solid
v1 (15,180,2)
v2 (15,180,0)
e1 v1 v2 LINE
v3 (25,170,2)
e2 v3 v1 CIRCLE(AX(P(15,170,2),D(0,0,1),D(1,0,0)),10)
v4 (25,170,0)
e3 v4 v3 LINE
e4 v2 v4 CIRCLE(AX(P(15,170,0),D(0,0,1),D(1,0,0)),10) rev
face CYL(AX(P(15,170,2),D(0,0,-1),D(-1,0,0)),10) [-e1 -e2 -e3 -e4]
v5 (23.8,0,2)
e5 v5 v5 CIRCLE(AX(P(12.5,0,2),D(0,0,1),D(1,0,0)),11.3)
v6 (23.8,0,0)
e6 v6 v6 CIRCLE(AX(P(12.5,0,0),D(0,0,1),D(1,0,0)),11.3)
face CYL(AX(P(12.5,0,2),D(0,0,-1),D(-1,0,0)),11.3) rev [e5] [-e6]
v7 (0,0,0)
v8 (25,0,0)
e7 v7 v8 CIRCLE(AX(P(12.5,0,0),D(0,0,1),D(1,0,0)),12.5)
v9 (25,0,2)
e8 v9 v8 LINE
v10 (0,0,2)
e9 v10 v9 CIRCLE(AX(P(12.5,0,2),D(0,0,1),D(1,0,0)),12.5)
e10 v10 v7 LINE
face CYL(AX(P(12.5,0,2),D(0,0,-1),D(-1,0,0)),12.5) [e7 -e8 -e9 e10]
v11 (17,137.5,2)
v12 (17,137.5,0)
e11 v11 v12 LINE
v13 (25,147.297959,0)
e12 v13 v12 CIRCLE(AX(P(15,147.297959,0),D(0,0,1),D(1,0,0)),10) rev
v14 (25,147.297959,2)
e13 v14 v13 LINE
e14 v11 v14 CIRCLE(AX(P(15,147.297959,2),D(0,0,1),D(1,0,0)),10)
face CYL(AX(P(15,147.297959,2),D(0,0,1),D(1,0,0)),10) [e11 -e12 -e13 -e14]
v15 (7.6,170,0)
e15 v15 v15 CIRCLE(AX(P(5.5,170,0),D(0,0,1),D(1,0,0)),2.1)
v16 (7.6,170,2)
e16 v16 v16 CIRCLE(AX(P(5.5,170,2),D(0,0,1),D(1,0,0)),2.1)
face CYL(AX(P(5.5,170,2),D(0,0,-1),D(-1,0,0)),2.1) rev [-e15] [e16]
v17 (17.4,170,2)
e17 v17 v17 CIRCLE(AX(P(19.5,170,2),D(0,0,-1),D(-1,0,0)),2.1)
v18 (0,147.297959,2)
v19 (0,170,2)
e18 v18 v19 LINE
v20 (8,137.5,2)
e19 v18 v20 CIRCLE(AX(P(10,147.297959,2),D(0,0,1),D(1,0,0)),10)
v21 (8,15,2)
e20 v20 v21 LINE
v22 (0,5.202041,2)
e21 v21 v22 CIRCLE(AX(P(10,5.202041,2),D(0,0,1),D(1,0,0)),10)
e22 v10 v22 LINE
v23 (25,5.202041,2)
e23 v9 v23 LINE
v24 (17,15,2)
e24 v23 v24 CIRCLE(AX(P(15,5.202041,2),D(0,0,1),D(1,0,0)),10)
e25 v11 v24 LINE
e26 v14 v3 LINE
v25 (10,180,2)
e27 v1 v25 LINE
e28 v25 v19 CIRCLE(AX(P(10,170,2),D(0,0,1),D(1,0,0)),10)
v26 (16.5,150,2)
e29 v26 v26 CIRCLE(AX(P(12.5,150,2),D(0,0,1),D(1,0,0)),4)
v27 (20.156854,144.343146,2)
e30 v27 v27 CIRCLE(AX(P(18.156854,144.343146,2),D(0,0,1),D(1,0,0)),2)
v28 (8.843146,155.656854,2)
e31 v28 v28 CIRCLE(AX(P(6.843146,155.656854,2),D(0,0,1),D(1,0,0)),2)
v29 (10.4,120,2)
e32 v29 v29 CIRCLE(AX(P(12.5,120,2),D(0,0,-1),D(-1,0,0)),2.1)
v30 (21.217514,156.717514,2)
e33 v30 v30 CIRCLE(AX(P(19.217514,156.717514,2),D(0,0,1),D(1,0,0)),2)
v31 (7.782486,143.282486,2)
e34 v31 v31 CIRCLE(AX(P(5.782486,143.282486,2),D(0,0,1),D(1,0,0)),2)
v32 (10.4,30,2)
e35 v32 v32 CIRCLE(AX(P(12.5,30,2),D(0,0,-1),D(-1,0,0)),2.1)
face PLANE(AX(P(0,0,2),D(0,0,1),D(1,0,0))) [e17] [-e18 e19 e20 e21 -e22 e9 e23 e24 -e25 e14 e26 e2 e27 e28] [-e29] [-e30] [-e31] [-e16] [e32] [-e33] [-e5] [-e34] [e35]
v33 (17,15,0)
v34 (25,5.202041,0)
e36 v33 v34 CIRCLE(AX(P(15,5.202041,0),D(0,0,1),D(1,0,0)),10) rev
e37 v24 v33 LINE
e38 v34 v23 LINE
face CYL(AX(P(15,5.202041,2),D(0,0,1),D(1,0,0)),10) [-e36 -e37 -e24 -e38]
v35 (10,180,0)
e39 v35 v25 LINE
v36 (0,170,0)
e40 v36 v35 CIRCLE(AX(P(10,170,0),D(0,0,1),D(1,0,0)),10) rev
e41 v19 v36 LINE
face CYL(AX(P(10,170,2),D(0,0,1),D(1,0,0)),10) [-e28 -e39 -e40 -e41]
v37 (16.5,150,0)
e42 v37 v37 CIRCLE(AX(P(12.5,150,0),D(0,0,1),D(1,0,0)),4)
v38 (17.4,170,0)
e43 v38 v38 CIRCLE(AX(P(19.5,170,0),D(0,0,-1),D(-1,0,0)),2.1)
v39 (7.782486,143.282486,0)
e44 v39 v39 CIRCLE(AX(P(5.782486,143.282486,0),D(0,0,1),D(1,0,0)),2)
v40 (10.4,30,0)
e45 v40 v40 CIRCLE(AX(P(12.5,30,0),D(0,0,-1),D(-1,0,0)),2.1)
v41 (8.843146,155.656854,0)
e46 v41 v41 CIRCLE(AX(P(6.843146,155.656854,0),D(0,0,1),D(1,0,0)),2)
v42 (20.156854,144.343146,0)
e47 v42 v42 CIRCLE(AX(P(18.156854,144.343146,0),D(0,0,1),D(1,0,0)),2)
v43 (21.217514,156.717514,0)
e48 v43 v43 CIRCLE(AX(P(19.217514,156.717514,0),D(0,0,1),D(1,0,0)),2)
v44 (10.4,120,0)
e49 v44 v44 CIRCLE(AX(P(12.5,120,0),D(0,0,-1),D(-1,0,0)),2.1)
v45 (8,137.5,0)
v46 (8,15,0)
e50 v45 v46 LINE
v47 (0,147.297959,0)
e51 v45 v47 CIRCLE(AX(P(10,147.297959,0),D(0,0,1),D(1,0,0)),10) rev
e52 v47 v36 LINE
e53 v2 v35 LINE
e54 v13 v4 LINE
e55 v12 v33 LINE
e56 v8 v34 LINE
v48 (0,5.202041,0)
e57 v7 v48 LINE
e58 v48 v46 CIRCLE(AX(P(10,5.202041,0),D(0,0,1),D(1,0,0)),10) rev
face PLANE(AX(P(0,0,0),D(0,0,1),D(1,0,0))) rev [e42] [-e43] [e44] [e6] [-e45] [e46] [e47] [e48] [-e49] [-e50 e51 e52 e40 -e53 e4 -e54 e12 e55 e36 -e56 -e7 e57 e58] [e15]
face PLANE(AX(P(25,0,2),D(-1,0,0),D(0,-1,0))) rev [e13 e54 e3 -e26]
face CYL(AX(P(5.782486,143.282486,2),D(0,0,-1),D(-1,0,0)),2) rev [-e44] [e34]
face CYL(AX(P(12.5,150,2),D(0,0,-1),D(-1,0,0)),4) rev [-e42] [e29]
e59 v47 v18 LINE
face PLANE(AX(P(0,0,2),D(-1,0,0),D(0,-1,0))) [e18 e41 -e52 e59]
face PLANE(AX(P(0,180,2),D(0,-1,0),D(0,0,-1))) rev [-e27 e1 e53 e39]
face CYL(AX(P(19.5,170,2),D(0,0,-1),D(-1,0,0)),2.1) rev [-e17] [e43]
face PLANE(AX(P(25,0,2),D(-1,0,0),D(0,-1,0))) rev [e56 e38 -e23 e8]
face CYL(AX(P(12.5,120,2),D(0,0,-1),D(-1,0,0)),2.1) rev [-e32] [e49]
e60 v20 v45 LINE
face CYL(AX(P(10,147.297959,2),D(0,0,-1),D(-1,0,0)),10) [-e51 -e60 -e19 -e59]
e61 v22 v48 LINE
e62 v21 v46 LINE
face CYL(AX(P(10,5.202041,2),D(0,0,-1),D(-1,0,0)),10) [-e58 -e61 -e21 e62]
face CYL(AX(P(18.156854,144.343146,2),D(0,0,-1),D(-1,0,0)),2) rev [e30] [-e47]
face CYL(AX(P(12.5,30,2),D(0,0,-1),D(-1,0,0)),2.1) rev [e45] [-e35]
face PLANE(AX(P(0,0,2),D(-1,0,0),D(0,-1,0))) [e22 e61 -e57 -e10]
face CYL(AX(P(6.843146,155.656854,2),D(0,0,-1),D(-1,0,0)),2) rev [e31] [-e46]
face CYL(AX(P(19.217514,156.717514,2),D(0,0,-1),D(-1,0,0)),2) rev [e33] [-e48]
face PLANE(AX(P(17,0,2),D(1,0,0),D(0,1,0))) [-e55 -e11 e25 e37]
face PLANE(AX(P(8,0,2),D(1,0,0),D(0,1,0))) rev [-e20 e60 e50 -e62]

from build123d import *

# Parameters (mm, degrees)
SKETCH1_R           = 11.3
SKETCH1_R_2         = 4
SKETCH1_R_3         = 2
BOSS_EXTRUDE1_DEPTH = 2
FILLET1_R           = 10
SKETCH2_R           = 2.1
CUT_EXTRUDE1_DEPTH  = 182.73882359


with BuildPart() as part:
    # Sketch1 → Boss-Extrude1 (new body)
    with BuildSketch(Plane.XY):
        with BuildLine():
            ThreePointArc((0, 0), (12.5, -12.5), (25, 0))
            Line((25, 0), (25, 15))
            Line((25, 15), (17, 15))
            Line((17, 15), (17, 137.5))
            Line((17, 137.5), (25, 137.5))
            Line((25, 137.5), (25, 180))
            Line((25, 180), (0, 180))
            Line((0, 180), (0, 137.5))
            Line((0, 137.5), (8, 137.5))
            Line((8, 137.5), (8, 15))
            Line((8, 15), (0, 15))
            Line((0, 15), (0, 0))
        make_face()
        with Locations((12.5, 0)):
            Circle(SKETCH1_R, mode=Mode.SUBTRACT)
        with Locations((12.5, 150)):
            Circle(SKETCH1_R_2, mode=Mode.SUBTRACT)
        with Locations((18.156854249, 144.343145751)):
            Circle(SKETCH1_R_3, mode=Mode.SUBTRACT)
        with Locations((5.782485579, 143.282485579)):
            Circle(SKETCH1_R_3, mode=Mode.SUBTRACT)
        with Locations((19.217514421, 156.717514421)):
            Circle(SKETCH1_R_3, mode=Mode.SUBTRACT)
        with Locations((6.843145751, 155.656854249)):
            Circle(SKETCH1_R_3, mode=Mode.SUBTRACT)
    extrude(amount=BOSS_EXTRUDE1_DEPTH)

    # Fillet1
    # the kernel refuses this fillet: 10 mm, written as the material it takes off along each edge
    with BuildSketch(Plane(origin=(25, 15, -24.494897428), x_dir=(0, -1, 0), z_dir=(0, 0, 1)), Plane(origin=(0, 137.5, -24.494897428), x_dir=(0, 1, 0), z_dir=(0, 0, 1))) as fillet1_piece_1:
        with BuildLine():
            CenterArc((9.797958971, -10), FILLET1_R, 90, 78.463040967)
            Line((0, -8), (-0.195959179, -7.96))
            ThreePointArc((-0.195959179, -7.96), (-0.2, -4), (-0.2, 0))
            Line((-0.2, 0), (0, 0.2))
            Line((0, 0.2), (9.797958971, 0.2))
            Line((9.797958971, 0.2), (9.797958971, 0))
        make_face()
    extrude(amount=50.989794856, mode=Mode.SUBTRACT)
    with BuildSketch(Plane(origin=(0, 15, -24.494897428), x_dir=(1, 0, 0), z_dir=(0, 0, 1)), Plane(origin=(25, 137.5, -24.494897428), x_dir=(-1, 0, 0), z_dir=(0, 0, 1))) as fillet1_piece_2:
        with BuildLine():
            CenterArc((10, -9.797958971), FILLET1_R, 101.536959033, 78.463040967)
            Line((0, -9.797958971), (-0.2, -9.797958971))
            Line((-0.2, -9.797958971), (-0.2, 0))
            Line((-0.2, 0), (0, 0.2))
            ThreePointArc((0, 0.2), (4, 0.2), (7.96, 0.195959179))
            Line((7.96, 0.195959179), (8, 0))
        make_face()
    extrude(amount=50.989794856, mode=Mode.SUBTRACT)
    with BuildSketch(Plane(origin=(0, 180, -25), x_dir=(1, 0, 0), z_dir=(0, 0, 1)), Plane(origin=(25, 180, -25), x_dir=(0, -1, 0), z_dir=(0, 0, 1))) as fillet1_piece_3:
        with BuildLine():
            CenterArc((FILLET1_R, -FILLET1_R), FILLET1_R, 90, 90)
            Line((0, -FILLET1_R), (-FILLET1_R * 0.02, -FILLET1_R))
            Line((-FILLET1_R * 0.02, -FILLET1_R), (-FILLET1_R * 0.02, FILLET1_R * 0.02))
            Line((-FILLET1_R * 0.02, FILLET1_R * 0.02), (FILLET1_R, FILLET1_R * 0.02))
            Line((FILLET1_R, FILLET1_R * 0.02), (FILLET1_R, 0))
        make_face()
    extrude(amount=52, mode=Mode.SUBTRACT)

    # Sketch2 → Cut-Extrude1 (cut, through all)
    with BuildSketch(Plane(origin=(0, 0, 0), x_dir=(-1, 0, 0), z_dir=(0, 0, -1))):
        with Locations((-12.5, 120)):
            Circle(SKETCH2_R)
        with Locations((-12.5, 30)):
            Circle(SKETCH2_R)
        with Locations((-19.5, 170)):
            Circle(SKETCH2_R)
        with Locations(Location((-5.5, 170, 0), (0, 0, 180))):
            Circle(SKETCH2_R)
    extrude(amount=-CUT_EXTRUDE1_DEPTH, mode=Mode.SUBTRACT)


solid = part.part
